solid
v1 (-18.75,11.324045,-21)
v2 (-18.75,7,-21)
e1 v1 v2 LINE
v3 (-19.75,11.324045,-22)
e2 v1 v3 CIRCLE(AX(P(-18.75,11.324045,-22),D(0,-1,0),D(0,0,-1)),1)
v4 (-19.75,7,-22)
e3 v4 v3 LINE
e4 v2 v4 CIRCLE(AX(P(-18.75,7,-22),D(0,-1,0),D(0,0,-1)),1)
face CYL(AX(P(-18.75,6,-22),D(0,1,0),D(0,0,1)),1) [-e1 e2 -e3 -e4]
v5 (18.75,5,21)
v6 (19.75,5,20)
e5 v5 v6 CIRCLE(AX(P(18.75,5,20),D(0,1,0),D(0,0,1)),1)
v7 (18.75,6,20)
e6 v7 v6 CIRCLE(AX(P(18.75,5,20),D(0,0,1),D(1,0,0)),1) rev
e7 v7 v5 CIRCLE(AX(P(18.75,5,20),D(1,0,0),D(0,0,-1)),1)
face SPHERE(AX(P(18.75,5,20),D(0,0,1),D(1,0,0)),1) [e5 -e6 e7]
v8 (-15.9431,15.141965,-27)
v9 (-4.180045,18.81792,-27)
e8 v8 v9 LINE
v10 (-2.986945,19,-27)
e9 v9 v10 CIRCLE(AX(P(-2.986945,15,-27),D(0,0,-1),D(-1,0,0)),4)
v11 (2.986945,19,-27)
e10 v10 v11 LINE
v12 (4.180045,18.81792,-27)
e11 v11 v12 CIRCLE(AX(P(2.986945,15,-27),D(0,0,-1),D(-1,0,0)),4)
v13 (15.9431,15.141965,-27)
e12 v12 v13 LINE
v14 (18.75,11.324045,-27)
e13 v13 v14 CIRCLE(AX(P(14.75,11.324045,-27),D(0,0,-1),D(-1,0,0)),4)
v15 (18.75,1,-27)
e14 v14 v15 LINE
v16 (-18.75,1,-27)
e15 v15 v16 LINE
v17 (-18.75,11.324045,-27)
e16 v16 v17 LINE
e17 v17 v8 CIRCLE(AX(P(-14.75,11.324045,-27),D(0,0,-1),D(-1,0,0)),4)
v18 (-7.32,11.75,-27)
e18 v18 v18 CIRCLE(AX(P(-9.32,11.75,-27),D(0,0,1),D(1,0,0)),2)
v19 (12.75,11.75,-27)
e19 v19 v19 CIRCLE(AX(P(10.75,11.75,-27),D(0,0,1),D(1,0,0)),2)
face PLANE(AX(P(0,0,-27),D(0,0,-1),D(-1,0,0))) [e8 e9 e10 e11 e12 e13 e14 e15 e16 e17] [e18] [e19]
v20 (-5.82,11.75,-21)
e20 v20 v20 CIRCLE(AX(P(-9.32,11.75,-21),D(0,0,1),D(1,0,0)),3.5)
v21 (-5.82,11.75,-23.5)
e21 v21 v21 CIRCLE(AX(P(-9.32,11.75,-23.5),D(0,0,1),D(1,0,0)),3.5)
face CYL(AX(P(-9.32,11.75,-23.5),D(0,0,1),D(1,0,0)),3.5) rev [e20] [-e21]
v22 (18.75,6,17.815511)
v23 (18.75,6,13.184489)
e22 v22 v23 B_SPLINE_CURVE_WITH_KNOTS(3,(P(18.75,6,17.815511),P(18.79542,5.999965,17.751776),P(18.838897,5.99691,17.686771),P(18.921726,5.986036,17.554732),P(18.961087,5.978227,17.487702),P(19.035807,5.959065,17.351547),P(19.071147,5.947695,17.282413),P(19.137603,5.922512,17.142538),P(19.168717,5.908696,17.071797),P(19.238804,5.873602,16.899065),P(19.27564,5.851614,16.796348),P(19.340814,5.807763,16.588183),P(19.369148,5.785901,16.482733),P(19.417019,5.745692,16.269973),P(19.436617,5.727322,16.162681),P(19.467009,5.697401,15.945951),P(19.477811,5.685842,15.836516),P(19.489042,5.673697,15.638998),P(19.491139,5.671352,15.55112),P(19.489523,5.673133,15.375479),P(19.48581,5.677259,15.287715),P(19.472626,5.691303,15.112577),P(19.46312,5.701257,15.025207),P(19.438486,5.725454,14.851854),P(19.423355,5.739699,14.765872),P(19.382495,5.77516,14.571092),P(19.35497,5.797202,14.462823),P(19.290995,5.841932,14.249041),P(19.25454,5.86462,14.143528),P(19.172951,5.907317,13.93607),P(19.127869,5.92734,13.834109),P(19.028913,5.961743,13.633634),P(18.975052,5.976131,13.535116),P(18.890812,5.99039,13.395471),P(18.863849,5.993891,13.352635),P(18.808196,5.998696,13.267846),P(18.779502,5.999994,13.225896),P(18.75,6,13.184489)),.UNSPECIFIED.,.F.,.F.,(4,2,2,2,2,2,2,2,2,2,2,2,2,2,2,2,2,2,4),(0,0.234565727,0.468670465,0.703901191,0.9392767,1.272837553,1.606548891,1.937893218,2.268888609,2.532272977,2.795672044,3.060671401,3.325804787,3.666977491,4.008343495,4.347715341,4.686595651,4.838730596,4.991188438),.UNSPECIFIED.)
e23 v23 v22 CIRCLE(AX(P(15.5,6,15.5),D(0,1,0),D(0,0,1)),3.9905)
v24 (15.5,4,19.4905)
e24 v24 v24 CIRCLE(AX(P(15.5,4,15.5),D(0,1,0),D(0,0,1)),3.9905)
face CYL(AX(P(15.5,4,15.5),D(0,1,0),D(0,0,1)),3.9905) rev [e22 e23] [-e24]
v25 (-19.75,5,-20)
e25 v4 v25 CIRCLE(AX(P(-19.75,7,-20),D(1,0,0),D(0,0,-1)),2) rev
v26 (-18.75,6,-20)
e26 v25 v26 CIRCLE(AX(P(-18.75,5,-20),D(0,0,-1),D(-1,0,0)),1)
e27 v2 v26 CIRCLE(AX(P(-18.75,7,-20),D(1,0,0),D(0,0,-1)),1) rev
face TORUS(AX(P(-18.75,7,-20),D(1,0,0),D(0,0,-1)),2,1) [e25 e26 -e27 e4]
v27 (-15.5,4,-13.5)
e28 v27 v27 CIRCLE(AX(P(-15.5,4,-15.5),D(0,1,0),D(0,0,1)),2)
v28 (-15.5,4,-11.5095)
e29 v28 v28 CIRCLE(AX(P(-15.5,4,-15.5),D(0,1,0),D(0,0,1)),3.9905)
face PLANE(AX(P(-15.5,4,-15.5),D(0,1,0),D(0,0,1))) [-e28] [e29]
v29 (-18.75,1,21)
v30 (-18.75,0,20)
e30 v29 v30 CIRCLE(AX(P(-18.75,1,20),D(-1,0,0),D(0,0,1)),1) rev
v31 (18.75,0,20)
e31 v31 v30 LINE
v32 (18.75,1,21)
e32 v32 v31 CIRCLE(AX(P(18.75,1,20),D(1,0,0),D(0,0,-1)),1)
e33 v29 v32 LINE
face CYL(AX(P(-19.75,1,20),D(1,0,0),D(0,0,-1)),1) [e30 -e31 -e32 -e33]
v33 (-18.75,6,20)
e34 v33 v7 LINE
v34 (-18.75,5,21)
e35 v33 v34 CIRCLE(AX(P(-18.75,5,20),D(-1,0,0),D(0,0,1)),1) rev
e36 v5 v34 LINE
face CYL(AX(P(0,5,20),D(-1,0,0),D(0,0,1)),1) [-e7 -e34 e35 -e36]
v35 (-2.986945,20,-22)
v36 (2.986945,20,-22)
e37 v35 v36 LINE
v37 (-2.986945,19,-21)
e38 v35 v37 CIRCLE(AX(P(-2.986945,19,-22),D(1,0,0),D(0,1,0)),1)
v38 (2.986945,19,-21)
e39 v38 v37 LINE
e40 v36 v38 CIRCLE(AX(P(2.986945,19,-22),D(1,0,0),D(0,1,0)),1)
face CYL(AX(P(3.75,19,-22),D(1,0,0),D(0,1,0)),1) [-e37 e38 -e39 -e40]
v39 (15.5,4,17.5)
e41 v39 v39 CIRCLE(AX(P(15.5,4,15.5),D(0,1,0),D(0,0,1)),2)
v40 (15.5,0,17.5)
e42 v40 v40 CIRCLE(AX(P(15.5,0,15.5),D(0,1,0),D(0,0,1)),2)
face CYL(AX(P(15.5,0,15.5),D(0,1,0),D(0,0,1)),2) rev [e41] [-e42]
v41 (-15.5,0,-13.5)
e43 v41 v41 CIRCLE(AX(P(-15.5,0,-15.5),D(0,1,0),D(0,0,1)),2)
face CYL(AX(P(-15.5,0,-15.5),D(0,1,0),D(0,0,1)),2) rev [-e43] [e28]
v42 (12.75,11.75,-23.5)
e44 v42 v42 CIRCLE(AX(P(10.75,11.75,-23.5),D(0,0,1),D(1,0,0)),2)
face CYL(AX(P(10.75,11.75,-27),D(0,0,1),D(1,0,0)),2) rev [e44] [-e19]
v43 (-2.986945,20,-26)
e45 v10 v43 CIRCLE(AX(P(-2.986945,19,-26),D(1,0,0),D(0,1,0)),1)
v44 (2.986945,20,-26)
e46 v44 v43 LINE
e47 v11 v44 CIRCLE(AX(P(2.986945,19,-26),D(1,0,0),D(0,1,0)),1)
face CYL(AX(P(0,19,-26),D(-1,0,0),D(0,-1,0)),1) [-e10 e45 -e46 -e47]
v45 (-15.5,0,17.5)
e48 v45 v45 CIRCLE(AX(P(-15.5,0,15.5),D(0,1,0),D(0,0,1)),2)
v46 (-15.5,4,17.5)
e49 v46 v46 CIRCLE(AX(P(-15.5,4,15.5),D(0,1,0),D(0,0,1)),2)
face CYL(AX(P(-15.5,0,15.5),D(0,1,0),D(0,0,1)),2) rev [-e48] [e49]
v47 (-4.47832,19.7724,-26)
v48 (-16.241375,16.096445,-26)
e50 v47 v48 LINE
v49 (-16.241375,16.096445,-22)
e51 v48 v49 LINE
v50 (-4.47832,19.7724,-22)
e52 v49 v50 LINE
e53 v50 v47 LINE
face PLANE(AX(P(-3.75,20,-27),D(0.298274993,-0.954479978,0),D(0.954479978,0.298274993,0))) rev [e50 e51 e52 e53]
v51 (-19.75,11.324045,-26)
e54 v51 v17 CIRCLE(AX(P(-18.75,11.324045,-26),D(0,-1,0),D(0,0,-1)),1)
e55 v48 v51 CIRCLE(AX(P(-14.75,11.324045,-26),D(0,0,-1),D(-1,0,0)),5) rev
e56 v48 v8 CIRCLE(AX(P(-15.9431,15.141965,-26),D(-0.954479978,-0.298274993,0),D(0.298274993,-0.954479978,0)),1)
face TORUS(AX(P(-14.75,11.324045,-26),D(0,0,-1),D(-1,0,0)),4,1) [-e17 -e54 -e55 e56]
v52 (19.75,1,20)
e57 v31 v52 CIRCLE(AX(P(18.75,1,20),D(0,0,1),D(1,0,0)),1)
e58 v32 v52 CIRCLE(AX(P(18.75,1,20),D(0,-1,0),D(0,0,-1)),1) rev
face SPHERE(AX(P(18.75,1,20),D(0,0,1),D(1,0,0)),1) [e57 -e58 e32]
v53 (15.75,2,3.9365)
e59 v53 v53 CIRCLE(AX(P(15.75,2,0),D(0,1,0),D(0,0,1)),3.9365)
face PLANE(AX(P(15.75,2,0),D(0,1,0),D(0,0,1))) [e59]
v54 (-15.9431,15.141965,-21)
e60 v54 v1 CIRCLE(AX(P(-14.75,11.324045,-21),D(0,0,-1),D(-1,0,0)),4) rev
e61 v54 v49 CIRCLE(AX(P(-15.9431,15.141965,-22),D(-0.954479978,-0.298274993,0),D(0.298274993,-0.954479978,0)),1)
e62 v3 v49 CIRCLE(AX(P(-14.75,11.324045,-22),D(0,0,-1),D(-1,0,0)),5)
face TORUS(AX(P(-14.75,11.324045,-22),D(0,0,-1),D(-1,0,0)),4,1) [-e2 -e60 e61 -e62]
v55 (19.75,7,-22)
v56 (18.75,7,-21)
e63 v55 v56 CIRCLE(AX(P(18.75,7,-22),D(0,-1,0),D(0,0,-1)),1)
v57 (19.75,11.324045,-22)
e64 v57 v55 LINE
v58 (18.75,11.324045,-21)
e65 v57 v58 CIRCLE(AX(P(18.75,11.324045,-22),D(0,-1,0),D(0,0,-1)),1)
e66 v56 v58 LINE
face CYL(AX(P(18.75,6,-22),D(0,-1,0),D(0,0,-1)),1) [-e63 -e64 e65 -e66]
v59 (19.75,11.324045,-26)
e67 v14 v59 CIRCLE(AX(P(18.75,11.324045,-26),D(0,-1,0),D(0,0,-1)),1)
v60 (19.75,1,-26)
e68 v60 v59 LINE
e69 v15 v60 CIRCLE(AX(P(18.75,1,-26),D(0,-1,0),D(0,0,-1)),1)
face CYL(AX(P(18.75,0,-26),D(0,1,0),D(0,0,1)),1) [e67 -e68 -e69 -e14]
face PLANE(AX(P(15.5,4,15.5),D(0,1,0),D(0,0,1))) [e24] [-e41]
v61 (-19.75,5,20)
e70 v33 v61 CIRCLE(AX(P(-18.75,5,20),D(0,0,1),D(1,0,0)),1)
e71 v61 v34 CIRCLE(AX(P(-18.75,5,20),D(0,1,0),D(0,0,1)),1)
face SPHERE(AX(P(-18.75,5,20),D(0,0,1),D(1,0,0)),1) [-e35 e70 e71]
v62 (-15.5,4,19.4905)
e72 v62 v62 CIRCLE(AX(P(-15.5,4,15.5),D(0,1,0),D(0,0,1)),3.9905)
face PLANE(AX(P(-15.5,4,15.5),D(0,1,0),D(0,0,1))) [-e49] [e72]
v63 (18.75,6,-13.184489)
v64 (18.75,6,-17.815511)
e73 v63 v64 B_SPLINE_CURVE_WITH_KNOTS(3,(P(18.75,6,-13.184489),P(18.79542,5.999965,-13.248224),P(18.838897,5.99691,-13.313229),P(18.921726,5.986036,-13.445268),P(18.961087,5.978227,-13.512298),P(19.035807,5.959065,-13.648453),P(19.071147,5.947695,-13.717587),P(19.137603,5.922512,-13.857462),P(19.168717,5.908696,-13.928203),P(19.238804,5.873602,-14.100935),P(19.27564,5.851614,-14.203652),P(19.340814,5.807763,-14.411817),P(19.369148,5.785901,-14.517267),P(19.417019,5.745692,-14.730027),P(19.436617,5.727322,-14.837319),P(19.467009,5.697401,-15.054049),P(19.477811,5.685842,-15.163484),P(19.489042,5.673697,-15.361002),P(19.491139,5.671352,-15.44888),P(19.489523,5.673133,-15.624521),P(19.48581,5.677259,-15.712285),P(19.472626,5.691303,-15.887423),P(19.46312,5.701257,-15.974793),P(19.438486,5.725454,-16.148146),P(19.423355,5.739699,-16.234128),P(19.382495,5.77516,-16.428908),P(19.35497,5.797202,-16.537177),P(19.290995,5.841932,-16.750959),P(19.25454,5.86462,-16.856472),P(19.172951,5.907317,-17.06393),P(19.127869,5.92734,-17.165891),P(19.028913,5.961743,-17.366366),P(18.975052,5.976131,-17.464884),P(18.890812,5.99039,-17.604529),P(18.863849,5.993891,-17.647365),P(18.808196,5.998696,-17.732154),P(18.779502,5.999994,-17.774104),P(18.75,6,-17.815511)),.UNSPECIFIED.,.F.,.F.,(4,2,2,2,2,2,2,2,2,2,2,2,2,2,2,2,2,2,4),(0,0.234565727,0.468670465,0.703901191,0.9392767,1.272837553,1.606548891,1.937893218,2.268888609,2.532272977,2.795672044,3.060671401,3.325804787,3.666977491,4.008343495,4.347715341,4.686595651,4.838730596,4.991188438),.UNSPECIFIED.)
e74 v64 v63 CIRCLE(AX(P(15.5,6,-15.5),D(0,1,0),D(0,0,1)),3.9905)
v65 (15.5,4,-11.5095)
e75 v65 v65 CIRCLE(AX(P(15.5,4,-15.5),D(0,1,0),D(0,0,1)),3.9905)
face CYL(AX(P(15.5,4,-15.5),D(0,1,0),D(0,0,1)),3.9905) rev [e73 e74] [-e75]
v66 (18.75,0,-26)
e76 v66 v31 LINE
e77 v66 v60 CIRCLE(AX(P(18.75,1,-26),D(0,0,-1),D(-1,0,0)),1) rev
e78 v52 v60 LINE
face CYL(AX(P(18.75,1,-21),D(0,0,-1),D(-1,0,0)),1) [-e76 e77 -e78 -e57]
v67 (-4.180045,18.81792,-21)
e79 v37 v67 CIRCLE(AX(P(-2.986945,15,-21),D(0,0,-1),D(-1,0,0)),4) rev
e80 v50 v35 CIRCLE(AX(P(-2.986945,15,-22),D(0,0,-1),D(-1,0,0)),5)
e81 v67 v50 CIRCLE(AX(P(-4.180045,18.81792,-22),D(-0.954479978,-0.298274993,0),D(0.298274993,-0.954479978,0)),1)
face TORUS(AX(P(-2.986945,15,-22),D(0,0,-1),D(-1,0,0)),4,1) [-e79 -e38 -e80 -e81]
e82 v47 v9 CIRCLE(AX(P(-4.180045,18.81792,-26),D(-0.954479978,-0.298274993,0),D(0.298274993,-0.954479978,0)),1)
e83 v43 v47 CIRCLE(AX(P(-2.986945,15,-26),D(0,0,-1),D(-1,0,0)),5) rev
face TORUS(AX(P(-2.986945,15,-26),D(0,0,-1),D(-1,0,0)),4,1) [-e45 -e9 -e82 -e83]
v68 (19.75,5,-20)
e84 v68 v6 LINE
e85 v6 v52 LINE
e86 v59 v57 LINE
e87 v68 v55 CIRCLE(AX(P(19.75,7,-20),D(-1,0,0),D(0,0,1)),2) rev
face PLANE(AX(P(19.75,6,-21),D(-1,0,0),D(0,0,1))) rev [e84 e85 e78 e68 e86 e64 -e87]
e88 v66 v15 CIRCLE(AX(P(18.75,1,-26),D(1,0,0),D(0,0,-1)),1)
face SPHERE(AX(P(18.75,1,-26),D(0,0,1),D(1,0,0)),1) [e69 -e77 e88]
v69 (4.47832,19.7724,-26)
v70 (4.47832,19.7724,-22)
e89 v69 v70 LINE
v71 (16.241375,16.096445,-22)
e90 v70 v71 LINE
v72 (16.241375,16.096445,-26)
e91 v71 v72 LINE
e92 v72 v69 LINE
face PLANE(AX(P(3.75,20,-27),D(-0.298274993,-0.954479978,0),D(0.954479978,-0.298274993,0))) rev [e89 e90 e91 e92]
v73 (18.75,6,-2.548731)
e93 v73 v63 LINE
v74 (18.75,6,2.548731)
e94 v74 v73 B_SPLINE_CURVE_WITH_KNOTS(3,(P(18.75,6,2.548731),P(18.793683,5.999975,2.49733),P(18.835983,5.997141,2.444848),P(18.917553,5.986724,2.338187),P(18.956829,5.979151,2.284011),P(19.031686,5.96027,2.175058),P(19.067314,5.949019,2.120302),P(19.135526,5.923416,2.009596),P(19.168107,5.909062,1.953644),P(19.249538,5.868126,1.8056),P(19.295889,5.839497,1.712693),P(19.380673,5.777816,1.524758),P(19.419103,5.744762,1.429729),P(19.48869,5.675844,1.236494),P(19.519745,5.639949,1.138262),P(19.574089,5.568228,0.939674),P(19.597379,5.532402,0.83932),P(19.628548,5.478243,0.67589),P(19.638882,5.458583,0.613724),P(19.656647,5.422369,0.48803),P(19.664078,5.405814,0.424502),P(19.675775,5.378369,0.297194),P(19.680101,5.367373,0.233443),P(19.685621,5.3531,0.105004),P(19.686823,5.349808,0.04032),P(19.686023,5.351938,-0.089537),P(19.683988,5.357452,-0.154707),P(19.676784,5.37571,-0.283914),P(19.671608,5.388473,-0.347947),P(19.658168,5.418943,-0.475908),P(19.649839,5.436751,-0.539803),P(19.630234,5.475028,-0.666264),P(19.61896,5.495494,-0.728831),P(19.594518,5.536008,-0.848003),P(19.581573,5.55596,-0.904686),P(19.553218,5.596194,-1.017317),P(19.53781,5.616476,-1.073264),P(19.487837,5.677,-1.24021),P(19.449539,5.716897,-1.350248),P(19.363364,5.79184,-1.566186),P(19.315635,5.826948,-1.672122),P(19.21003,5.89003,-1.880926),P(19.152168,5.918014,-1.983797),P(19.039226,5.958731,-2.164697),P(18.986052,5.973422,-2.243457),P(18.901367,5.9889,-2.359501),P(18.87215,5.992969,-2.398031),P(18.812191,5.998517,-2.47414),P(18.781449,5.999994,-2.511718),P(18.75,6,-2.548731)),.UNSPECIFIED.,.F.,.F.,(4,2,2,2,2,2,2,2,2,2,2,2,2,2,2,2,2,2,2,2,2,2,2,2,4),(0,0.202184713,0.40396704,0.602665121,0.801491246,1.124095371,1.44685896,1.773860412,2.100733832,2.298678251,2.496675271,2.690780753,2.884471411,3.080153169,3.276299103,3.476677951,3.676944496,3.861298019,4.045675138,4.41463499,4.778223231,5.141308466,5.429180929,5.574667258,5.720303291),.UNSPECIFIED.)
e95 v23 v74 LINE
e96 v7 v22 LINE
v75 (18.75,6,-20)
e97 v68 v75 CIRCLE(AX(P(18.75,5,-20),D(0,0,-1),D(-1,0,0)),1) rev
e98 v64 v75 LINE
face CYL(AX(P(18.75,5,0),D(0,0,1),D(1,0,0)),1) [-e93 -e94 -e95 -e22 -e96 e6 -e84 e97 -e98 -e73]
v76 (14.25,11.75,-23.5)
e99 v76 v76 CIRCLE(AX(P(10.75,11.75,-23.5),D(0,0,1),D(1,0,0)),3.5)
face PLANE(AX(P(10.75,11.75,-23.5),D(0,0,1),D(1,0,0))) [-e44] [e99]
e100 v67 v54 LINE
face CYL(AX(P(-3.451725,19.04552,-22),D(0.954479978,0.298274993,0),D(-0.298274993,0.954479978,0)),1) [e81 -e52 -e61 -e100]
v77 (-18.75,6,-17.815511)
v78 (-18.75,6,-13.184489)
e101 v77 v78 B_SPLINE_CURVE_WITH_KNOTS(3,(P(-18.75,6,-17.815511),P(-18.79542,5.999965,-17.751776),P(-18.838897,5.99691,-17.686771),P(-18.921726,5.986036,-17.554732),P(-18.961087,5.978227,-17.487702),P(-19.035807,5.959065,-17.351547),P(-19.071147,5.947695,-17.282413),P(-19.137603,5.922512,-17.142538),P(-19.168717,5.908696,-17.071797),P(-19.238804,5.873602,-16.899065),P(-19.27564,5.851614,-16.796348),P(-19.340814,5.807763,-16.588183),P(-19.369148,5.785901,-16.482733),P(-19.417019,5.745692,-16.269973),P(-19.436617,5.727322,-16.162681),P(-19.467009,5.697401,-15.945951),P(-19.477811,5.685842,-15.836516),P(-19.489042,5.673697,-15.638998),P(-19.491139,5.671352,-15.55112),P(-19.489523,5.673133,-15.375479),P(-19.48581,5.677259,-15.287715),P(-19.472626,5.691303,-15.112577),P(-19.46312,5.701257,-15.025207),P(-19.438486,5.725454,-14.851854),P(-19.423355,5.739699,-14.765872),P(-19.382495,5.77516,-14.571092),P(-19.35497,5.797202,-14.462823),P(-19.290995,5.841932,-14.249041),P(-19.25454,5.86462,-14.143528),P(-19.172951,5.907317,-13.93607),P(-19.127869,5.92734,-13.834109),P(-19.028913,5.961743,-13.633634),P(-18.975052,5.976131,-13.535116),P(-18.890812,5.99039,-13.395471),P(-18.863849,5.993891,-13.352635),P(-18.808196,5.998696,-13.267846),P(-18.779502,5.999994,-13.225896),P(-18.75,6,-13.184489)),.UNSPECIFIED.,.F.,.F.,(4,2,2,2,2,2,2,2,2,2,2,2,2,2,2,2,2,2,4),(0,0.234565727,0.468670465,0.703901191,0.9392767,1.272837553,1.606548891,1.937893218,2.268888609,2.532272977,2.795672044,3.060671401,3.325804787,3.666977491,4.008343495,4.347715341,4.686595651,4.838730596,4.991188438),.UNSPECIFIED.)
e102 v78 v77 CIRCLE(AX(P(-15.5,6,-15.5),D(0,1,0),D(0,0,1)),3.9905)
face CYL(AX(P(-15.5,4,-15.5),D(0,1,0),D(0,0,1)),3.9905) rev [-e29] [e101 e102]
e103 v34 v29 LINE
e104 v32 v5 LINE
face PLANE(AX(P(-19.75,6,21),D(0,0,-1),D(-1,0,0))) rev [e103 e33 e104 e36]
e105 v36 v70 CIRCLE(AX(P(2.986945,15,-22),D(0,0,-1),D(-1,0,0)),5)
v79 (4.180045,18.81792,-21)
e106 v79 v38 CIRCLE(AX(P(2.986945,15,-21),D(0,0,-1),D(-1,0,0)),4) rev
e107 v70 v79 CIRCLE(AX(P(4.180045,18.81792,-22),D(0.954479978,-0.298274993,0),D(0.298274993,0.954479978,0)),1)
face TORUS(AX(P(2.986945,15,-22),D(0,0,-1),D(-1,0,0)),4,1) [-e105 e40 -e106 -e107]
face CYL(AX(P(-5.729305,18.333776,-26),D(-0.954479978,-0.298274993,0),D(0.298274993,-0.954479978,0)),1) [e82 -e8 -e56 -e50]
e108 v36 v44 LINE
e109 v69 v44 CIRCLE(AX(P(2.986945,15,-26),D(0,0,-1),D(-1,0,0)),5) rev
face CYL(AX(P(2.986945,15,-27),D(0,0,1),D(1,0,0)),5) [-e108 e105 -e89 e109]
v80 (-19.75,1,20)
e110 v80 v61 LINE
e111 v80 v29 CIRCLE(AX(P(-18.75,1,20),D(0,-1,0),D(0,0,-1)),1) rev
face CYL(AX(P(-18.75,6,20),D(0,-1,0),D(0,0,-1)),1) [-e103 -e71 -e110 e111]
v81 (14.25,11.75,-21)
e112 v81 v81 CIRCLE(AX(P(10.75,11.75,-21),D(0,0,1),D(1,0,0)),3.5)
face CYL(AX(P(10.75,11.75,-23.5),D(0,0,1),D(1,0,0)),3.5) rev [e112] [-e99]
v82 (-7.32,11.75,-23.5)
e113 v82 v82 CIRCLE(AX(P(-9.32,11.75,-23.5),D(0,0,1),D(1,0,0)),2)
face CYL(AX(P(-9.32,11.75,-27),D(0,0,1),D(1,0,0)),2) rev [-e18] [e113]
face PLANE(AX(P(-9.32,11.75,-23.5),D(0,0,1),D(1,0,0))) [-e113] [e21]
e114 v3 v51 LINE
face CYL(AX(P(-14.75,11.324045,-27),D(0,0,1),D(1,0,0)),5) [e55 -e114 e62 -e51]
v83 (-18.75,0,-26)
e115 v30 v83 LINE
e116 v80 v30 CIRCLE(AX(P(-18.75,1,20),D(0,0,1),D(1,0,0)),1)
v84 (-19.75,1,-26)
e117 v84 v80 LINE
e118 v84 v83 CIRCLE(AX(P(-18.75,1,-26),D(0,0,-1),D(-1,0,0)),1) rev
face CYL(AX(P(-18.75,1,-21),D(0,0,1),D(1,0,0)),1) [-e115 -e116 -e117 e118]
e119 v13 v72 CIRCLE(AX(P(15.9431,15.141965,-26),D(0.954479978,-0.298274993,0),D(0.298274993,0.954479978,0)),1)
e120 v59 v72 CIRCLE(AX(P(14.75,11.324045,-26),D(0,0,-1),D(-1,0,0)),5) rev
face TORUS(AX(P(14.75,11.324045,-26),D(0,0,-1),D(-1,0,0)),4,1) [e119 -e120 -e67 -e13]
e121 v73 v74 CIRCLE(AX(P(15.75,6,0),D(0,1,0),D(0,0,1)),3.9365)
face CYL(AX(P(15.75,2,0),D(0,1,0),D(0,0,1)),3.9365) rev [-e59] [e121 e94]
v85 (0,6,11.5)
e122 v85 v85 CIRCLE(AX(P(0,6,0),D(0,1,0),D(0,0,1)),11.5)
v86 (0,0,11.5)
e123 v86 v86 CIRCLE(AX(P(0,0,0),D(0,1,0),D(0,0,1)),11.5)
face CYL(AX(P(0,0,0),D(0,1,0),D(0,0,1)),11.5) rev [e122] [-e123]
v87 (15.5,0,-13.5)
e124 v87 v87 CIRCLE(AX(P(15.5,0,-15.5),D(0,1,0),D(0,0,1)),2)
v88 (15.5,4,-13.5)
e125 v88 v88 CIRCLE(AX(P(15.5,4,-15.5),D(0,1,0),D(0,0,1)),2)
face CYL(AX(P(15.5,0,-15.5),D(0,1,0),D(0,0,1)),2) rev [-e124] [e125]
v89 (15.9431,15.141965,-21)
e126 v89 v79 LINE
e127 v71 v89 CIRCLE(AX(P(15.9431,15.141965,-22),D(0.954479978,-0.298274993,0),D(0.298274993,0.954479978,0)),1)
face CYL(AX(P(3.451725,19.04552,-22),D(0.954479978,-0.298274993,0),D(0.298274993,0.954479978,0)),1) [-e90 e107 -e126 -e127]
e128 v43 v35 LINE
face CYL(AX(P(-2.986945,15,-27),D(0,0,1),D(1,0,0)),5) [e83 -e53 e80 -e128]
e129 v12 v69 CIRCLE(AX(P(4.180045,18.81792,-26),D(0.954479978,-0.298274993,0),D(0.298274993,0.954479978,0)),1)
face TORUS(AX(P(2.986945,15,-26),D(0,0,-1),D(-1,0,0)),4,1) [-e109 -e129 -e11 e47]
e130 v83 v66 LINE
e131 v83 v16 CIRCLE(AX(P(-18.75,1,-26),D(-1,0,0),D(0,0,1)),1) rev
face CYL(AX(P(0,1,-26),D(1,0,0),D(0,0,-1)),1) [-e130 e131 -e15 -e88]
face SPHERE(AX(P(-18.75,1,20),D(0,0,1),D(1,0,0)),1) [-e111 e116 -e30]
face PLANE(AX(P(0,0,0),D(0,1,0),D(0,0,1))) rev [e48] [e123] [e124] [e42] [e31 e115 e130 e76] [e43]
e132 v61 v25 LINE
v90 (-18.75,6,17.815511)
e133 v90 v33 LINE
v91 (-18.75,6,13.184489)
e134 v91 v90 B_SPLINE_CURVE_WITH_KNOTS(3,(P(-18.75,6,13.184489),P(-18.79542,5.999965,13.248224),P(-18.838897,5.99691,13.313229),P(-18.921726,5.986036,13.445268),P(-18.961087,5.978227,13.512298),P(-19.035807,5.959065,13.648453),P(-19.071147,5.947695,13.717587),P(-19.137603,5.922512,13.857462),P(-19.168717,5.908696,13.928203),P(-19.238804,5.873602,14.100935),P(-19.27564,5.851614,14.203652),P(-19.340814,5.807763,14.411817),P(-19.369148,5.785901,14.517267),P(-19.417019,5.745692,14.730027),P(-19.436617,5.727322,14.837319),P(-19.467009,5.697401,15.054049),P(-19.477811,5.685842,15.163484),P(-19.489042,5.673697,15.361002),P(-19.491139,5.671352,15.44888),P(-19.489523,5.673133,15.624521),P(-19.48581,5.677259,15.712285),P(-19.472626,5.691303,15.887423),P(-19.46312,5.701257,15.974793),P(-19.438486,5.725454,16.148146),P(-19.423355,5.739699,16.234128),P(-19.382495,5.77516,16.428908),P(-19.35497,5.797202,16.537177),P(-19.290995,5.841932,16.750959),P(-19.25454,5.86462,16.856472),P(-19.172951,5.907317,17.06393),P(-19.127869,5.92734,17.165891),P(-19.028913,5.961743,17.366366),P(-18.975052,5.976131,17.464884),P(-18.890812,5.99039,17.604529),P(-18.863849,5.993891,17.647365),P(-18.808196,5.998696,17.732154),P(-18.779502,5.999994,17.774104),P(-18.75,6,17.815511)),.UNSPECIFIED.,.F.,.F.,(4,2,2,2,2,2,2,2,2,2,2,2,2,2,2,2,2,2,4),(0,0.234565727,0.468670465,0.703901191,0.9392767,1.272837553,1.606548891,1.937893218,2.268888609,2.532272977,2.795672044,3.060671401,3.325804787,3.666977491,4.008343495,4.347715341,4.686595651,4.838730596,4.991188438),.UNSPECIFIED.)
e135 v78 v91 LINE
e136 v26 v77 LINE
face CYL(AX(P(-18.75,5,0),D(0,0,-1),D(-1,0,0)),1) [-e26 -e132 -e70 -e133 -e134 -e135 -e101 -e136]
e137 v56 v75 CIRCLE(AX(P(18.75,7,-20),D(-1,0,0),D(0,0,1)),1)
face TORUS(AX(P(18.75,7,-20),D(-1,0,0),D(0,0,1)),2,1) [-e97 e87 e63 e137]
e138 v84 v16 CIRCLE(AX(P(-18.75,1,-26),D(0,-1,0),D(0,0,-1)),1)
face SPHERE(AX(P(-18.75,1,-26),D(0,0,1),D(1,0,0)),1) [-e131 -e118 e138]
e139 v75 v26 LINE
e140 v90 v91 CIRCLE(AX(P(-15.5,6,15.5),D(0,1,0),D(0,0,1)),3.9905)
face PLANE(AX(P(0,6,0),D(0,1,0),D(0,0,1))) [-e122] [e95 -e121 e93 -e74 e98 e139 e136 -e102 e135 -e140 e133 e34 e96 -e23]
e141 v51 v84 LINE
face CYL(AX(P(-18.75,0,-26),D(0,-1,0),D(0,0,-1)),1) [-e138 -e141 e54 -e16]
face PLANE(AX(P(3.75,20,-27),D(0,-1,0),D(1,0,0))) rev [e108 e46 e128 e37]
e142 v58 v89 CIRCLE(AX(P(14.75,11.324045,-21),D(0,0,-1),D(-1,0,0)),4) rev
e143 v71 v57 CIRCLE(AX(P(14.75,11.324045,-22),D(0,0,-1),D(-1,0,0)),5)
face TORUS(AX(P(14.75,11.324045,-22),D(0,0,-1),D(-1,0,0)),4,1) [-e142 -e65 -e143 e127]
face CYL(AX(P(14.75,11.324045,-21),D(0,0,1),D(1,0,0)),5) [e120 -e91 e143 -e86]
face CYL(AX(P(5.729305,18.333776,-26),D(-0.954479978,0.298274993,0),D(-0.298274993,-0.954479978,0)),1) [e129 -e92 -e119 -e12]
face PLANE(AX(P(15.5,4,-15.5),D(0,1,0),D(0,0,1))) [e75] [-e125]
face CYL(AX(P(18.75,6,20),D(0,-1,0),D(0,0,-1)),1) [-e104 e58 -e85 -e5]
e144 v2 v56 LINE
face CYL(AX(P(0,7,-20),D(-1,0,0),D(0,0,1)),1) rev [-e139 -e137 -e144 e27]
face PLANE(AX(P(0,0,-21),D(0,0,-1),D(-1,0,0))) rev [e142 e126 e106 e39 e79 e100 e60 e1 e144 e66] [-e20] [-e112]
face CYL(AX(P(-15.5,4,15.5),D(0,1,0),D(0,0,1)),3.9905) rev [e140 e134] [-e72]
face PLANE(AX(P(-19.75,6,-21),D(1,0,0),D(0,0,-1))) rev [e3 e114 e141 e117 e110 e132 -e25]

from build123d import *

# Parameters (mm, degrees)
SKETCH1_W           = 39.5
SKETCH1_H           = 42
BOSS_EXTRUDE1_DEPTH = 6
SKETCH3_R           = 3.9905
CUT_EXTRUDE1_DEPTH  = 2
SKETCH4_R           = 11.5
SKETCH4_R_2         = 2
CUT_EXTRUDE2_DEPTH  = 30.445925015
BOSS_EXTRUDE2_DEPTH = 6
SKETCH6_R           = 3.5
CUT_EXTRUDE3_DEPTH  = 2.5
SKETCH7_R           = 2
CUT_EXTRUDE4_DEPTH  = 51.537733428
FILLET1_R           = 5
SKETCH8_R           = 3.9365
CUT_EXTRUDE5_DEPTH  = 4
FILLET2_R           = 1


with BuildPart() as part:
    # Sketch1 → Boss-Extrude1 (new body)
    with BuildSketch(Plane(origin=(0, 0, 0), x_dir=(1, 0, 0), z_dir=(0, 1, 0))):
        Rectangle(SKETCH1_W, SKETCH1_H)
    extrude(amount=BOSS_EXTRUDE1_DEPTH)

    # Sketch3 → Cut-Extrude1 (cut)
    with BuildSketch(Plane(origin=(0, 6, 0), x_dir=(1, 0, 0), z_dir=(0, 1, 0))):
        with Locations(Location((-15.5, 15.5, 0), (0, 0, 270))):
            Circle(SKETCH3_R)
        with Locations(Location((15.5, 15.5, 0), (0, 0, 270))):
            Circle(SKETCH3_R)
        with Locations(Location((-15.5, -15.5, 0), (0, 0, 270))):
            Circle(SKETCH3_R)
        with Locations(Location((15.5, -15.5, 0), (0, 0, 270))):
            Circle(SKETCH3_R)
    extrude(amount=-CUT_EXTRUDE1_DEPTH, mode=Mode.SUBTRACT)

    # Sketch4 → Cut-Extrude2 (cut, through all)
    with BuildSketch(Plane(origin=(0, 6, 0), x_dir=(1, 0, 0), z_dir=(0, 1, 0))):
        with Locations(Location((0, 0, 0), (0, 0, 270))):
            Circle(SKETCH4_R)
        with Locations(Location((15.5, 15.5, 0), (0, 0, 270))):
            Circle(SKETCH4_R_2)
        with Locations(Location((-15.5, 15.5, 0), (0, 0, 270))):
            Circle(SKETCH4_R_2)
        with Locations(Location((-15.5, -15.5, 0), (0, 0, 270))):
            Circle(SKETCH4_R_2)
        with Locations(Location((15.5, -15.5, 0), (0, 0, 270))):
            Circle(SKETCH4_R_2)
    extrude(amount=-CUT_EXTRUDE2_DEPTH, mode=Mode.SUBTRACT)

    # Sketch5 → Boss-Extrude2 (add)
    with BuildSketch(Plane(origin=(0, 0, -21), x_dir=(-1, 0, 0), z_dir=(0, 0, -1))):
        Polygon((-19.75, 15), (-19.75, 0), (19.75, 0), (19.75, 15), (3.75, 20), (-3.75, 20), align=None)
    extrude(amount=BOSS_EXTRUDE2_DEPTH)

    # Sketch6 → Cut-Extrude3 (cut)
    with BuildSketch(Plane.XY.offset(-21)):
        with Locations((-9.32, 11.75)):
            Circle(SKETCH6_R)
        with Locations((10.75, 11.75)):
            Circle(SKETCH6_R)
    extrude(amount=-CUT_EXTRUDE3_DEPTH, mode=Mode.SUBTRACT)

    # Sketch7 → Cut-Extrude4 (cut, through all)
    with BuildSketch(Plane.XY.offset(-21)):
        with Locations((-9.32, 11.75)):
            Circle(SKETCH7_R)
        with Locations((10.75, 11.75)):
            Circle(SKETCH7_R)
    extrude(amount=-CUT_EXTRUDE4_DEPTH, mode=Mode.SUBTRACT)

    # Fillet1
    fillet1_edges = [part.edges().sort_by_distance(p)[0] for p in [
        (-19.75, 15, -24),
        (-3.75, 20, -24),
        (3.75, 20, -24),
        (19.75, 15, -24),
    ]]
    fillet(fillet1_edges, radius=FILLET1_R)

    # Sketch8 → Cut-Extrude5 (cut)
    with BuildSketch(Plane(origin=(0, 6, 0), x_dir=(1, 0, 0), z_dir=(0, 1, 0))):
        with Locations(Location((15.75, 0, 0), (0, 0, 270))):
            Circle(SKETCH8_R)
    extrude(amount=-CUT_EXTRUDE5_DEPTH, mode=Mode.SUBTRACT)

    # Fillet2
    # the kernel refuses this fillet: 1 mm, written as the material it adds along each edge
    with BuildSketch(Plane(origin=(-19.75, 6, -21), x_dir=(0, 1, 0), z_dir=(1, 0, 0))) as fillet2_piece_1:
        with BuildLine():
            CenterArc((FILLET2_R, FILLET2_R), FILLET2_R, 180, 90)
            Line((0, FILLET2_R), (0, 0))
            Line((0, 0), (FILLET2_R, 0))
        make_face()
    extrude(amount=39.5)
    # the kernel refuses this fillet: 1 mm, written as the material it takes off along each edge
    with BuildSketch(Plane(origin=(18.75, 1, 20), x_dir=(0, 0, 1), z_dir=(1, 0, 0))) as fillet2_2_piece_1_section:
        Polygon((0, 0), (FILLET2_R, 0), (FILLET2_R, FILLET2_R), (0, FILLET2_R), align=None)
    fillet2_2_piece_1 = extrude(amount=FILLET2_R, mode=Mode.PRIVATE)
    fillet2_2_piece_1 = fillet2_2_piece_1 - Plane(origin=(18.75, 1, 20), x_dir=(0, 0.7071067811865475, -0.7071067811865475), z_dir=(1, 0, 0)) * Sphere(FILLET2_R, mode=Mode.PRIVATE)
    add(fillet2_2_piece_1, mode=Mode.SUBTRACT)
    with BuildSketch(Plane(origin=(-18.75, 1, 20), x_dir=(0, 0, 1), z_dir=(-1, 0, 0))) as fillet2_2_piece_2_section:
        Polygon((0, 0), (FILLET2_R, 0), (FILLET2_R, -FILLET2_R), (0, -FILLET2_R), align=None)
    fillet2_2_piece_2 = extrude(amount=FILLET2_R, mode=Mode.PRIVATE)
    fillet2_2_piece_2 = fillet2_2_piece_2 - Plane(origin=(-18.75, 1, 20), x_dir=(0, 0.7071067811865475, -0.7071067811865475), z_dir=(-1, 0, 0)) * Sphere(FILLET2_R, mode=Mode.PRIVATE)
    add(fillet2_2_piece_2, mode=Mode.SUBTRACT)
    with BuildSketch(Plane(origin=(-18.75, 1, -26), x_dir=(0, 0, -1), z_dir=(-1, 0, 0))) as fillet2_2_piece_3_section:
        Polygon((0, 0), (FILLET2_R, 0), (FILLET2_R, FILLET2_R), (0, FILLET2_R), align=None)
    fillet2_2_piece_3 = extrude(amount=FILLET2_R, mode=Mode.PRIVATE)
    fillet2_2_piece_3 = fillet2_2_piece_3 - Plane(origin=(-18.75, 1, -26), x_dir=(0, 0.7071067811865475, 0.7071067811865475), z_dir=(-1, 0, 0)) * Sphere(FILLET2_R, mode=Mode.PRIVATE)
    add(fillet2_2_piece_3, mode=Mode.SUBTRACT)
    with BuildSketch(Plane(origin=(18.75, 1, -26), x_dir=(0, 0, -1), z_dir=(1, 0, 0))) as fillet2_2_piece_4_section:
        Polygon((0, 0), (FILLET2_R, 0), (FILLET2_R, -FILLET2_R), (0, -FILLET2_R), align=None)
    fillet2_2_piece_4 = extrude(amount=FILLET2_R, mode=Mode.PRIVATE)
    fillet2_2_piece_4 = fillet2_2_piece_4 - Plane(origin=(18.75, 1, -26), x_dir=(0, 0.7071067811865475, 0.7071067811865475), z_dir=(1, 0, 0)) * Sphere(FILLET2_R, mode=Mode.PRIVATE)
    add(fillet2_2_piece_4, mode=Mode.SUBTRACT)
    with BuildSketch(Plane(origin=(-2.986945386, 15, -27), x_dir=(-0.2982749931359463, 0.9544799780350299, 0), z_dir=(-0.9544799780350299, -0.2982749931359463, 0))) as fillet2_2_piece_5:
        with BuildLine():
            CenterArc((5 - FILLET2_R, -FILLET2_R), FILLET2_R, 0, 90)
            Line((5, -FILLET2_R), (5, 0))
            Line((5, 0), (5 - FILLET2_R, 0))
        make_face()
    revolve(axis=Axis((-2.986945386, 15, -27), (0, 0, -1)), revolution_arc=17.354024636, mode=Mode.SUBTRACT)
    with BuildSketch(Plane(origin=(2.986945386, 15, -27), x_dir=(0.29827499313594724, 0.9544799780350296, 0), z_dir=(0.9544799780350296, -0.29827499313594724, 0))) as fillet2_2_piece_6:
        with BuildLine():
            CenterArc((5 - FILLET2_R, FILLET2_R), FILLET2_R, 270, 90)
            Line((5, FILLET2_R), (5, 0))
            Line((5, 0), (5 - FILLET2_R, 0))
        make_face()
    revolve(axis=Axis((2.986945386, 15, -27), (0, 0, 1)), revolution_arc=17.354024636, mode=Mode.SUBTRACT)
    with BuildSketch(Plane(origin=(14.75, 11.324045433, -27), x_dir=(1, 0, 0), z_dir=(0, -1, 0))) as fillet2_2_piece_7:
        with BuildLine():
            CenterArc((5 - FILLET2_R, FILLET2_R), FILLET2_R, 270, 90)
            Line((5, FILLET2_R), (5, 0))
            Line((5, 0), (5 - FILLET2_R, 0))
        make_face()
    revolve(axis=Axis((14.75, 11.324045433, -27), (0, 0, 1)), revolution_arc=72.645975364, mode=Mode.SUBTRACT)
    with BuildSketch(Plane(origin=(22.25, 6, 21), x_dir=(0, 0, -1), z_dir=(-1, 0, 0))) as fillet2_2_piece_8:
        with BuildLine():
            CenterArc((FILLET2_R, FILLET2_R), FILLET2_R, 180, 90)
            Line((0, FILLET2_R), (0, 0))
            Line((0, 0), (FILLET2_R, 0))
        make_face()
    extrude(amount=44.5, mode=Mode.SUBTRACT)
    with BuildSketch(Plane(origin=(18.75, 0, 21), x_dir=(0, 1, 0), z_dir=(-1, 0, 0))) as fillet2_2_piece_9:
        with BuildLine():
            CenterArc((FILLET2_R, FILLET2_R), FILLET2_R, 180, 90)
            Line((0, FILLET2_R), (0, 0))
            Line((0, 0), (FILLET2_R, 0))
        make_face()
    extrude(amount=37.5, mode=Mode.SUBTRACT)
    with BuildSketch(Plane(origin=(-19.75, 0, -26), x_dir=(0, 1, 0), z_dir=(0, 0, 1)), Plane(origin=(19.75, 0, -26), x_dir=(-1, 0, 0), z_dir=(0, 0, 1))) as fillet2_2_piece_10:
        with BuildLine():
            CenterArc((FILLET2_R, -FILLET2_R), FILLET2_R, 90, 90)
            Line((0, -FILLET2_R), (0, 0))
            Line((0, 0), (FILLET2_R, 0))
        make_face()
    extrude(amount=46, mode=Mode.SUBTRACT)
    with BuildSketch(Plane(origin=(-19.75, 1, -27), x_dir=(0, 0, 1), z_dir=(0, 1, 0))) as fillet2_2_piece_11:
        with BuildLine():
            CenterArc((FILLET2_R, FILLET2_R), FILLET2_R, 180, 90)
            Line((0, FILLET2_R), (0, 0))
            Line((0, 0), (FILLET2_R, 0))
        make_face()
    extrude(amount=10.324045433, mode=Mode.SUBTRACT)
    with BuildSketch(Plane(origin=(18.75, 0, -27), x_dir=(0, 1, 0), z_dir=(-1, 0, 0))) as fillet2_2_piece_12:
        with BuildLine():
            CenterArc((FILLET2_R, -FILLET2_R), FILLET2_R, 90, 90)
            Line((0, -FILLET2_R), (0, 0))
            Line((0, 0), (FILLET2_R, 0))
        make_face()
    extrude(amount=37.5, mode=Mode.SUBTRACT)
    with BuildSketch(Plane(origin=(19.75, 1, 21), x_dir=(-1, 0, 0), z_dir=(0, 1, 0)), Plane(origin=(-19.75, 1, 21), x_dir=(0, 0, -1), z_dir=(0, 1, 0))) as fillet2_2_piece_13:
        with BuildLine():
            CenterArc((FILLET2_R, -FILLET2_R), FILLET2_R, 90, 90)
            Line((0, -FILLET2_R), (0, 0))
            Line((0, 0), (FILLET2_R, 0))
        make_face()
    extrude(amount=7.5, mode=Mode.SUBTRACT)
    with BuildSketch(Plane(origin=(19.75, 11.324045433, -27), x_dir=(-1, 0, 0), z_dir=(0, -1, 0))) as fillet2_2_piece_14:
        with BuildLine():
            CenterArc((FILLET2_R, -FILLET2_R), FILLET2_R, 90, 90)
            Line((0, -FILLET2_R), (0, 0))
            Line((0, 0), (FILLET2_R, 0))
        make_face()
    extrude(amount=10.324045433, mode=Mode.SUBTRACT)
    with BuildSketch(Plane(origin=(4.478320351, 19.77239989, -27), x_dir=(-0.29827499313594713, -0.9544799780350296, 0), z_dir=(0.9544799780350297, -0.29827499313594713, 0)), Plane(origin=(-16.241374966, 16.096445323, -27), x_dir=(0.2982749931359466, -0.9544799780350298, 0), z_dir=(0.9544799780350299, 0.29827499313594663, 0))) as fillet2_2_piece_15:
        with BuildLine():
            CenterArc((FILLET2_R, -FILLET2_R), FILLET2_R, 90, 90)
            Line((0, -FILLET2_R), (0, 0))
            Line((0, 0), (FILLET2_R, 0))
        make_face()
    extrude(amount=12.324045433, mode=Mode.SUBTRACT)
    with BuildSketch(Plane(origin=(-2.986945386, 20, -27), x_dir=(0, -1, 0), z_dir=(1, 0, 0))) as fillet2_2_piece_16:
        with BuildLine():
            CenterArc((FILLET2_R, -FILLET2_R), FILLET2_R, 90, 90)
            Line((0, -FILLET2_R), (0, 0))
            Line((0, 0), (FILLET2_R, 0))
        make_face()
    extrude(amount=5.973890772, mode=Mode.SUBTRACT)
    with BuildSketch(Plane(origin=(-14.75, 11.324045433, -27), x_dir=(-1, 0, 0), z_dir=(0, -1, 0))) as fillet2_2_piece_17:
        with BuildLine():
            CenterArc((5 - FILLET2_R, -FILLET2_R), FILLET2_R, 0, 90)
            Line((5 - FILLET2_R, 0), (5, 0))
            Line((5, 0), (5, -FILLET2_R))
        make_face()
    revolve(axis=Axis((-14.75, 11.324045433, -27), (0, 0, -1)), revolution_arc=72.645975364, mode=Mode.SUBTRACT)
    # the kernel refuses this fillet: 1 mm, written as the material it takes off along each edge
    with BuildSketch(Plane(origin=(18.75, 5, 20), x_dir=(1, 0, 0), z_dir=(0, 1, 0))) as fillet2_3_piece_1_section:
        Polygon((0, 0), (FILLET2_R, 0), (FILLET2_R, -FILLET2_R), (0, -FILLET2_R), align=None)
    fillet2_3_piece_1 = extrude(amount=FILLET2_R, mode=Mode.PRIVATE)
    fillet2_3_piece_1 = fillet2_3_piece_1 - Plane(origin=(18.75, 5, 20), x_dir=(-0.7071067811865476, 0, -0.7071067811865475), z_dir=(0, 1, 0)) * Sphere(FILLET2_R, mode=Mode.PRIVATE)
    add(fillet2_3_piece_1, mode=Mode.SUBTRACT)
    with BuildSketch(Plane(origin=(-18.75, 5, 20), x_dir=(0, 1, 0), z_dir=(-1, 0, 0))) as fillet2_3_piece_2_section:
        Polygon((0, 0), (FILLET2_R, 0), (FILLET2_R, -FILLET2_R), (0, -FILLET2_R), align=None)
    fillet2_3_piece_2 = extrude(amount=FILLET2_R, mode=Mode.PRIVATE)
    fillet2_3_piece_2 = fillet2_3_piece_2 - Plane(origin=(-18.75, 5, 20), x_dir=(0, -0.7071067811865475, -0.7071067811865475), z_dir=(-1, 0, 0)) * Sphere(FILLET2_R, mode=Mode.PRIVATE)
    add(fillet2_3_piece_2, mode=Mode.SUBTRACT)
    with BuildSketch(Plane(origin=(-19.75, 6, 20), x_dir=(0, -1, 0), z_dir=(0, 0, -1))) as fillet2_3_piece_3:
        with BuildLine():
            CenterArc((FILLET2_R, -FILLET2_R), FILLET2_R, 90, 90)
            Line((0, -FILLET2_R), (0, 0))
            Line((0, 0), (FILLET2_R, 0))
        make_face()
    extrude(amount=40, mode=Mode.SUBTRACT)
    with BuildSketch(Plane(origin=(19.75, 6, -20), x_dir=(-1, 0, 0), z_dir=(0, 0, 1))) as fillet2_3_piece_4:
        with BuildLine():
            CenterArc((FILLET2_R, FILLET2_R), FILLET2_R, 180, 90)
            Line((0, FILLET2_R), (0, 0))
            Line((0, 0), (FILLET2_R, 0))
        make_face()
    extrude(amount=40, mode=Mode.SUBTRACT)
    with BuildSketch(Plane(origin=(-19.75, 7, -21), x_dir=(0, 0, -1), z_dir=(0, 1, 0))) as fillet2_3_piece_5:
        with BuildLine():
            CenterArc((FILLET2_R, -FILLET2_R), FILLET2_R, 90, 90)
            Line((0, -FILLET2_R), (0, 0))
            Line((0, 0), (FILLET2_R, 0))
        make_face()
    extrude(amount=4.324045433, mode=Mode.SUBTRACT)
    with BuildSketch(Plane(origin=(19.75, 11.324045433, -21), x_dir=(-1, 0, 0), z_dir=(0, -1, 0))) as fillet2_3_piece_6:
        with BuildLine():
            CenterArc((FILLET2_R, FILLET2_R), FILLET2_R, 180, 90)
            Line((0, FILLET2_R), (0, 0))
            Line((0, 0), (FILLET2_R, 0))
        make_face()
    extrude(amount=4.324045433, mode=Mode.SUBTRACT)
    with BuildSketch(Plane(origin=(4.478320351, 19.77239989, -21), x_dir=(-0.29827499313594713, -0.9544799780350296, 0), z_dir=(0.9544799780350297, -0.29827499313594713, 0)), Plane(origin=(-16.241374966, 16.096445323, -21), x_dir=(0.2982749931359466, -0.9544799780350298, 0), z_dir=(0.9544799780350299, 0.29827499313594663, 0))) as fillet2_3_piece_7:
        with BuildLine():
            CenterArc((FILLET2_R, FILLET2_R), FILLET2_R, 180, 90)
            Line((0, FILLET2_R), (0, 0))
            Line((0, 0), (FILLET2_R, 0))
        make_face()
    extrude(amount=12.324045433, mode=Mode.SUBTRACT)
    with BuildSketch(Plane(origin=(-2.986945386, 20, -21), x_dir=(0, -1, 0), z_dir=(1, 0, 0))) as fillet2_3_piece_8:
        with BuildLine():
            CenterArc((FILLET2_R, FILLET2_R), FILLET2_R, 180, 90)
            Line((0, FILLET2_R), (0, 0))
            Line((0, 0), (FILLET2_R, 0))
        make_face()
    extrude(amount=5.973890772, mode=Mode.SUBTRACT)
    with BuildSketch(Plane(origin=(-14.75, 11.324045433, -21), x_dir=(-1, 0, 0), z_dir=(0, -1, 0))) as fillet2_3_piece_9:
        with BuildLine():
            CenterArc((5 - FILLET2_R, FILLET2_R), FILLET2_R, 270, 90)
            Line((5 - FILLET2_R, 0), (5, 0))
            Line((5, 0), (5, FILLET2_R))
        make_face()
    revolve(axis=Axis((-14.75, 11.324045433, -21), (0, 0, -1)), revolution_arc=72.645975364, mode=Mode.SUBTRACT)
    with BuildSketch(Plane(origin=(-2.986945386, 15, -21), x_dir=(-0.2982749931359463, 0.9544799780350299, 0), z_dir=(-0.9544799780350299, -0.2982749931359463, 0))) as fillet2_3_piece_10:
        with BuildLine():
            CenterArc((5 - FILLET2_R, FILLET2_R), FILLET2_R, 270, 90)
            Line((5, FILLET2_R), (5, 0))
            Line((5, 0), (5 - FILLET2_R, 0))
        make_face()
    revolve(axis=Axis((-2.986945386, 15, -21), (0, 0, -1)), revolution_arc=17.354024636, mode=Mode.SUBTRACT)
    with BuildSketch(Plane(origin=(2.986945386, 15, -21), x_dir=(0.29827499313594724, 0.9544799780350296, 0), z_dir=(0.9544799780350296, -0.29827499313594724, 0))) as fillet2_3_piece_11:
        with BuildLine():
            CenterArc((5 - FILLET2_R, -FILLET2_R), FILLET2_R, 0, 90)
            Line((5, -FILLET2_R), (5, 0))
            Line((5, 0), (5 - FILLET2_R, 0))
        make_face()
    revolve(axis=Axis((2.986945386, 15, -21), (0, 0, 1)), revolution_arc=17.354024636, mode=Mode.SUBTRACT)
    with BuildSketch(Plane(origin=(14.75, 11.324045433, -21), x_dir=(1, 0, 0), z_dir=(0, -1, 0))) as fillet2_3_piece_12:
        with BuildLine():
            CenterArc((5 - FILLET2_R, -FILLET2_R), FILLET2_R, 0, 90)
            Line((5, -FILLET2_R), (5, 0))
            Line((5, 0), (5 - FILLET2_R, 0))
        make_face()
    revolve(axis=Axis((14.75, 11.324045433, -21), (0, 0, 1)), revolution_arc=72.645975364, mode=Mode.SUBTRACT)
    with BuildSketch(Plane(origin=(19.75, 7, -20), x_dir=(0, 0, -1), z_dir=(0, 1, 0))) as fillet2_3_piece_13:
        with BuildLine():
            CenterArc((1 + FILLET2_R, FILLET2_R), FILLET2_R, 180, 90)
            Line((1 + FILLET2_R, 0), (1, 0))
            Line((1, 0), (1, FILLET2_R))
        make_face()
    revolve(axis=Axis((19.75, 7, -20), (-1, 0, 0)), revolution_arc=90, mode=Mode.SUBTRACT)
    with BuildSketch(Plane(origin=(-19.75, 7, -20), x_dir=(0, 0, -1), z_dir=(0, 1, 0))) as fillet2_3_piece_14:
        with BuildLine():
            CenterArc((1 + FILLET2_R, -FILLET2_R), FILLET2_R, 90, 90)
            Line((1, -FILLET2_R), (1, 0))
            Line((1, 0), (1 + FILLET2_R, 0))
        make_face()
    revolve(axis=Axis((-19.75, 7, -20), (-1, 0, 0)), revolution_arc=90, mode=Mode.SUBTRACT)


solid = part.part
